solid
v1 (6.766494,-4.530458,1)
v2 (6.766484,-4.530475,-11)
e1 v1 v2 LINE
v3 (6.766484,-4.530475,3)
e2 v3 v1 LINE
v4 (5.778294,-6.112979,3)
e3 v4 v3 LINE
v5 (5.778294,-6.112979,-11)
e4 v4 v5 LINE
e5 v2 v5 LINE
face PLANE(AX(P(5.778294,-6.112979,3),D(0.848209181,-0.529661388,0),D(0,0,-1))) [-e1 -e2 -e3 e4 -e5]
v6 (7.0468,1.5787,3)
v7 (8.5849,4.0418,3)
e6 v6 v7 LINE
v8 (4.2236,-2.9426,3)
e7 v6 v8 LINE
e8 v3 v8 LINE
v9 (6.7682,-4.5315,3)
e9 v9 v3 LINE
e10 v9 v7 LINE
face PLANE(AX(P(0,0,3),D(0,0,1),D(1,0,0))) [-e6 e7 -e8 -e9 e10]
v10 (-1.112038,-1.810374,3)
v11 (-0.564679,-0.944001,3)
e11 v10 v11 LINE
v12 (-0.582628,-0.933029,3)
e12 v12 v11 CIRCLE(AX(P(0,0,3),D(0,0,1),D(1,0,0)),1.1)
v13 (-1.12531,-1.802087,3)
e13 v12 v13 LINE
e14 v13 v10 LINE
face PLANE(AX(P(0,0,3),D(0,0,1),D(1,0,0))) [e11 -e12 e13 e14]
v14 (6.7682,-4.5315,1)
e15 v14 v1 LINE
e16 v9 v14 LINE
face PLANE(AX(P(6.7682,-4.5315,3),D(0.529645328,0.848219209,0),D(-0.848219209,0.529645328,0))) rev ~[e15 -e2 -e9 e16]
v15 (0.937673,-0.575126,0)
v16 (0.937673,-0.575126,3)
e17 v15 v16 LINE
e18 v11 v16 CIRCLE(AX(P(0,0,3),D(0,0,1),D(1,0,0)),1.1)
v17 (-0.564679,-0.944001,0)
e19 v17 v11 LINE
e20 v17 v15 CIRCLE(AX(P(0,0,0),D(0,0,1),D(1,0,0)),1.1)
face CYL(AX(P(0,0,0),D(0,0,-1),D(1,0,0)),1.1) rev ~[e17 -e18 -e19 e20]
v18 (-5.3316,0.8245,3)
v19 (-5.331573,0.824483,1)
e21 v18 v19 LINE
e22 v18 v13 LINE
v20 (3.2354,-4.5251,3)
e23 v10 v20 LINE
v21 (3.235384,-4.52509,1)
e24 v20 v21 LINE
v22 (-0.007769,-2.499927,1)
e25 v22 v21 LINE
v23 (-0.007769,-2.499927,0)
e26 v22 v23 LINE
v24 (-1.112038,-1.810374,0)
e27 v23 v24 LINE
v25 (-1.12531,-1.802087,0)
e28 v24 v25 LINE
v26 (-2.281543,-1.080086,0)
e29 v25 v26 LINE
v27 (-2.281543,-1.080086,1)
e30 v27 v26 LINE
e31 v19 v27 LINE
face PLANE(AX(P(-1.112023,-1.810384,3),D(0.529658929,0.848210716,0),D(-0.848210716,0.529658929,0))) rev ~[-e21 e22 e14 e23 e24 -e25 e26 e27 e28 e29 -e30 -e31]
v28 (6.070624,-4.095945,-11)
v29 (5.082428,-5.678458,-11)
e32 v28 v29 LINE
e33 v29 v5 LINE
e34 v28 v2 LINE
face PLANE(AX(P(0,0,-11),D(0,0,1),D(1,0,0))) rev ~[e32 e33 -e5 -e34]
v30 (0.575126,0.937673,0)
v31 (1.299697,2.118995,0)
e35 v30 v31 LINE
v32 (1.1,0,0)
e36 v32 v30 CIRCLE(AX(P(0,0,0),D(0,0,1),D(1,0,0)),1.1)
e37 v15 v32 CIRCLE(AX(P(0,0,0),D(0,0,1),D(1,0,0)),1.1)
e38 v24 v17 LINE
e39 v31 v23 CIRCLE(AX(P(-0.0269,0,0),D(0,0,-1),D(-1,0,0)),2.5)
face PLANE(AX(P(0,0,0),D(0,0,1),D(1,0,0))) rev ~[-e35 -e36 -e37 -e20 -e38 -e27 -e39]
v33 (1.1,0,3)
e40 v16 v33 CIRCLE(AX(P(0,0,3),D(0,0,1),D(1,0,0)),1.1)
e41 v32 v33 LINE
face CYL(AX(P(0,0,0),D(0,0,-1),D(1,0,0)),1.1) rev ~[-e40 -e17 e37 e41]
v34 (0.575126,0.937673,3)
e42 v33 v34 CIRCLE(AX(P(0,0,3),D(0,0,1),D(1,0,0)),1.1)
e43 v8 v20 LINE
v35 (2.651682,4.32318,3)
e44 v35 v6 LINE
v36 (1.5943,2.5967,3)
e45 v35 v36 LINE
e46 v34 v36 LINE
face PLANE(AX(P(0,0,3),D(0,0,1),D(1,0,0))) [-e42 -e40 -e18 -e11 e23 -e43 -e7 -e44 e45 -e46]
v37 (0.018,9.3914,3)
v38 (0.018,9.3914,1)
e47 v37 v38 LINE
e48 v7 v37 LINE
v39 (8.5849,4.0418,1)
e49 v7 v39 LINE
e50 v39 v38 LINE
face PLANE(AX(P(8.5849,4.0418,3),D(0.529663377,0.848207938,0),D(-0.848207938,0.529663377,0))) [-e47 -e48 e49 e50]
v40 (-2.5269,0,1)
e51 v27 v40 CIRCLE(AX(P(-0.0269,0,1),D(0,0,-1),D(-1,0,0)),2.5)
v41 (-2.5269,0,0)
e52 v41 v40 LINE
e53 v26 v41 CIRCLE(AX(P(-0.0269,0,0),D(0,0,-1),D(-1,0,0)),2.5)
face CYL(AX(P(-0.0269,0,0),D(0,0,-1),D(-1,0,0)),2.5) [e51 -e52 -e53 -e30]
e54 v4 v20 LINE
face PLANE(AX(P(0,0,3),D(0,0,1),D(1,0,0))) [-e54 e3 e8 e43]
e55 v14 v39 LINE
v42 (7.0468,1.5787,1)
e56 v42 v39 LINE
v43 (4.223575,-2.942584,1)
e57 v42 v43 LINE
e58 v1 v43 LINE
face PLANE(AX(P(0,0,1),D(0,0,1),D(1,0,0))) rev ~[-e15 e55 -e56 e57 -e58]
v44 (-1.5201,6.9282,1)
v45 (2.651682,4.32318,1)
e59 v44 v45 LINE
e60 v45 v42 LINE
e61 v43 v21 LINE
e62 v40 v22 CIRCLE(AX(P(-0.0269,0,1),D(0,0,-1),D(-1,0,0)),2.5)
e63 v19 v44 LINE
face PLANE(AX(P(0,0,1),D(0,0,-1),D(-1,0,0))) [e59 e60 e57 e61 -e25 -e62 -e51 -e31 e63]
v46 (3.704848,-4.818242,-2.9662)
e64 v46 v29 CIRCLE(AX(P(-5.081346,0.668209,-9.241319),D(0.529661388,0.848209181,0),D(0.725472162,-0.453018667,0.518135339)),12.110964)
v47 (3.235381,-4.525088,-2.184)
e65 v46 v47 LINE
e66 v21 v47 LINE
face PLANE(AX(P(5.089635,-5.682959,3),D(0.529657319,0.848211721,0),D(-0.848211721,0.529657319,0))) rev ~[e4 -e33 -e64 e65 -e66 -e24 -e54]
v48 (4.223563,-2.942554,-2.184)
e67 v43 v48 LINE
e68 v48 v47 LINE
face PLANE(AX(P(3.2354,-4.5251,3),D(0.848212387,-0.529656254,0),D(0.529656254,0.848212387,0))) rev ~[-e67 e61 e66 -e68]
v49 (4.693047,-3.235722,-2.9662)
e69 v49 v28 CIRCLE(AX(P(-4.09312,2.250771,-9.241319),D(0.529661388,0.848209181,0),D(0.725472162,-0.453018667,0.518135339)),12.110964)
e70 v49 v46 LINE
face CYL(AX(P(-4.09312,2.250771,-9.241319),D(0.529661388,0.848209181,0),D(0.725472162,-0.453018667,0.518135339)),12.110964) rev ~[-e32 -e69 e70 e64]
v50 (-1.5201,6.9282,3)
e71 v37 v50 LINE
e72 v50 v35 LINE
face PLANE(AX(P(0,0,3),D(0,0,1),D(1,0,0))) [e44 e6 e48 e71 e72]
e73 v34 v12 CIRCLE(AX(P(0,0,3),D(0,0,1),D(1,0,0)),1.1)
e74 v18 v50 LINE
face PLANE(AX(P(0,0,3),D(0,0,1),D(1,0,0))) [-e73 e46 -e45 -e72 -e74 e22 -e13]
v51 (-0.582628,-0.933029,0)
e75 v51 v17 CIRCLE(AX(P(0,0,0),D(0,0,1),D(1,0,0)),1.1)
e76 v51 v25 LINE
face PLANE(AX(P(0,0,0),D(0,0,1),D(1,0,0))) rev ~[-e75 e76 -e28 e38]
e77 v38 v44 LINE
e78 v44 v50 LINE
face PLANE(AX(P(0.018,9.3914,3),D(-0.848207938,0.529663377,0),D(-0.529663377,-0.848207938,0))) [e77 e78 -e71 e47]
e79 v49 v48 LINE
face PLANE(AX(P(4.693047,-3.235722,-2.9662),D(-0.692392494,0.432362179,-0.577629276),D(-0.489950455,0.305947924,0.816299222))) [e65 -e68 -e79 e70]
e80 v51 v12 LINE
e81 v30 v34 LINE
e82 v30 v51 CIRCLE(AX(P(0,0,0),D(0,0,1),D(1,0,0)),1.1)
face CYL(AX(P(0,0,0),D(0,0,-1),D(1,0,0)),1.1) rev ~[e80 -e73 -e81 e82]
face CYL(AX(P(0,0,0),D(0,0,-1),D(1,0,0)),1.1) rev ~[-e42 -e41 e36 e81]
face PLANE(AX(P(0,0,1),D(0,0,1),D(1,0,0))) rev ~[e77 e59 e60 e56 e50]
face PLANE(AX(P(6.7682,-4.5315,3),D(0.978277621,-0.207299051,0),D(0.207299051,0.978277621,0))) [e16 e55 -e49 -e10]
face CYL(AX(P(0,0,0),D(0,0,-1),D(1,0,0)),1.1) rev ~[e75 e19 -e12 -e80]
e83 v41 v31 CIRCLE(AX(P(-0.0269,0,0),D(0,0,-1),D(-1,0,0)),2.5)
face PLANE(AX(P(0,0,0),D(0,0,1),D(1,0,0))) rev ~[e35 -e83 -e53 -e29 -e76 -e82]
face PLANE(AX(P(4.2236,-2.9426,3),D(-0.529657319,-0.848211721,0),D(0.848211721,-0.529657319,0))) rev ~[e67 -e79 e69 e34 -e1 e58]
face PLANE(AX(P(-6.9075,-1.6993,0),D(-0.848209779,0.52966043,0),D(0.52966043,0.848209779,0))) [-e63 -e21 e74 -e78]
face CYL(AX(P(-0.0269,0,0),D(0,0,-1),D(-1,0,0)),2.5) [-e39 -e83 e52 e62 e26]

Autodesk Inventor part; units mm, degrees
ref_plane "YZ Plane" through (0, 0, 0) normal (1, 0, 0) x (0, 1, 0)
ref_plane "XZ Plane" through (0, 0, 0) normal (0, 1, 0) x (-1, 0, 0)
ref_plane "XY Plane" through (0, 0, 0) normal (0, 0, 1) x (1, 0, 0)
sketch "Skizze1" plane through (0, 0, 0) normal (0, 0, 1) x (1, 0, 0)
  circle A0 centre (0, 0) radius 0.5718 construction
  circle A1 centre (0, 0) radius 1.1
  line L0 (-3.4324, -5.4831) -> (-0.3524, -0.608) projected
  line L1 (12.1628, 19.8522) -> (1.5943, 2.5967) projected
  line L2 (0, 0) -> (-2.7013, -4.3259)
  line L3 (0, 0) -> (2.6665, 4.3474)
  line L4 (0, 0) -> (4.3474, -2.6665)
  line L5 (1.6594, -7.0489) -> (-6.9075, -1.6993)
  line L6 (-6.9075, -1.6993) -> (-1.5201, 6.9282)
  line L7 (-1.5201, 6.9282) -> (7.0468, 1.5787)
  line L8 (7.0468, 1.5787) -> (1.6594, -7.0489)
  dimension "d0" = 2.2
  dimension "d1" = 5.1
  dimension "d2" = 5.1
  dimension "d3" = 5.1
  dimension "d4" = 10.1
extrude "Extrusion1" add sketch "Skizze1" along normal blind 3 contours A1 L3 L1 L7 L8 L5 L0 | A1 L2 L5 L6 L7 L1 L3 | A1 L0 L2
sketch "Skizze2" plane through (0, 0, 0) normal (0, 0, -1) x (-1, 0, 0)
  circle A0 centre (0, 0) radius 1.1 projected
  line L0 (-1.6594, -7.0489) -> (6.9075, -1.6993) projected
  line L1 (6.9075, -1.6993) -> (1.5201, 6.9282) projected
  line L2 (1.5201, 6.9282) -> (-7.0468, 1.5787) projected
  line L3 (-7.0468, 1.5787) -> (-1.6594, -7.0489) projected
  circle A1 centre (0, 0) radius 1.1
  circle A2 centre (0.0269, 0) radius 2.5
  dimension "d7" = 5
extrude "Extrusion2" cut sketch "Skizze2" against normal blind 1 contours L3 L2 L1 L0
sketch "Skizze3" plane through (0, 0, 3) normal (0, 0, 1) x (1, 0, 0)
  circle A0 centre (0, 0) radius 1.1 projected
  line L0 (-6.9075, -1.6993) -> (1.6594, -7.0489) projected
  line L1 (1.6594, -7.0489) -> (7.0468, 1.5787) projected
  line L2 (7.0468, 1.5787) -> (-1.5201, 6.9282) projected
  line L3 (-1.5201, 6.9282) -> (-6.9075, -1.6993) projected
  line L4 (-2.6241, -4.3741) -> (-1.1, -1.79)
  line L5 (-6.9075, -1.6993) -> (1.6594, -7.0489)
  line L6 (1.6594, -7.0489) -> (3.2354, -4.5251)
  line L7 (3.2354, -4.5251) -> (-5.3316, 0.8245)
  line L8 (-5.3316, 0.8245) -> (-6.9075, -1.6993)
  dimension "d10" = 3
extrude "Extrusion3" cut sketch "Skizze3" against normal through all contours L3 L7 L4 L0 | L4 L7 L1 L0
sketch "Skizze4" plane through (0, 0, 3) normal (0, 0, 1) x (1, 0, 0)
  line L0 (-5.3316, 0.8245) -> (3.2354, -4.5251) projected
  line L1 (3.2354, -4.5251) -> (7.0468, 1.5787) projected
  line L2 (7.0468, 1.5787) -> (-1.5201, 6.9282) projected
  line L3 (-1.5201, 6.9282) -> (-5.3316, 0.8245) projected
  circle A0 centre (0, 0) radius 1.1 projected
  line L4 (-5.3316, 0.8245) -> (3.2354, -4.5251) projected
  line L5 (-5.3316, 0.8245) -> (3.2354, -4.5251)
  line L6 (3.2354, -4.5251) -> (8.5849, 4.0418)
  line L7 (8.5849, 4.0418) -> (0.018, 9.3914)
  line L8 (0.018, 9.3914) -> (-5.3316, 0.8245)
  dimension "d13" = 10.1
extrude "Extrusion4" add sketch "Skizze4" against normal up to surface (2 mm away) contours L8 L7 L6 L2
sketch "Skizze5" plane through (0, 0, 3) normal (0, 0, 1) x (1, 0, 0)
  line L0 (4.2881, -6.9427) -> (6.1322, -4.0444) projected
  line L1 (5.7598, -3.8294) -> (4.7032, -3.2194) projected
  line L2 (-5.3316, 0.8245) -> (3.2354, -4.5251) projected
  line L3 (3.2354, -4.5251) -> (8.5849, 4.0418) projected
  line L4 (8.5849, 4.0418) -> (0.018, 9.3914) projected
  line L5 (0.018, 9.3914) -> (-5.3316, 0.8245) projected
  circle A0 centre (0, 0) radius 1.1 projected
  line L6 (3.2354, -4.5251) -> (8.5849, 4.0418) projected
  line L7 (3.2354, -4.5251) -> (4.2236, -2.9426)
  line L8 (4.2236, -2.9426) -> (7.6164, -5.0612)
  line L9 (7.6164, -5.0612) -> (6.6282, -6.6437)
  line L10 (6.6282, -6.6437) -> (3.2354, -4.5251)
  dimension "d16" = 4
extrude "Extrusion5" add sketch "Skizze5" against normal blind 14 contours L10 L3 L8 L0 | L0 L8 L9 L10
sketch "Skizze6" plane through (7.6164, -5.0612, 3) normal (0.5296614, 0.8482092, 0) x (0.8482092, -0.5296614, 0)
  line L0 (-1.7975, 12.28) -> (-2.2192, 15.496) projected
  line L1 (-1.9046, 10.7265) -> (-1.9053, 12.2728) projected
  line L2 (-1.9046, 10.7265) -> (-2.6926, 7.736) projected
  line L3 (-2.2272, 9.066) -> (-3.4465, 6.126) projected
  line L4 (-4.252, 5.184) -> (-3.4465, 6.126) projected
  line L5 (-4, 2) -> (-4, 14) projected
  arc A0 (-4, 5.4787) -> (-2.0084, 13.888) centre (-13.8052, 12.2414) ccw construction
  arc A1 (-3.4465, 5.9662) -> (-1.8224, 14) centre (-13.8052, 12.2414) ccw
  line L6 (-4, 14) -> (0, 14) projected
  line L7 (-1.8224, 14) -> (-4, 14)
  line L8 (-4, 14) -> (-4, 5.1324)
  line L9 (-1.9018, 5.1324) -> (-1.8224, 5.1324)
  line L10 (-3.4465, 5.9662) -> (-4, 5.184)
  point P0 (-9.141, 3)
extrude "Extrusion6" cut sketch "Skizze6" against normal through all
sketch "Skizze7" plane through (6.6282, -6.6437, 3) normal (0.8482092, -0.5296614, 0) x (0, 0, -1)
  line L0 (0, 0) -> (0, 1.8657) projected
  line L1 (0, 0) -> (14, 0) projected
  line L2 (14, 1.8657) -> (14, 0) projected
  line L3 (0, 1.8657) -> (14, 1.8657) projected
  point P0 (3, 2.1246)
extrude "Extrusion7" cut sketch "Skizze7" against normal blind 1
sketch "Skizze8" plane through (0, 0, 3) normal (0, 0, 1) x (1, 0, 0)
  circle A0 centre (0, 0) radius 1.1 projected
  line L0 (5.78, -6.1141) -> (6.7682, -4.5315) projected
  line L1 (6.7682, -4.5315) -> (4.2236, -2.9426) projected
  line L2 (4.2236, -2.9426) -> (8.5849, 4.0418) projected
  line L3 (8.5849, 4.0418) -> (0.018, 9.3914) projected
  line L4 (0.018, 9.3914) -> (-5.3316, 0.8245) projected
  line L5 (-5.3316, 0.8245) -> (5.78, -6.1141) projected
  line L6 (6.7682, -4.5315) -> (8.5849, 4.0418)
extrude "Extrusion8" add sketch "Skizze8" against normal up to surface (2 mm away) contours L1 L2 L6
properties part number "thumb_base_plate" material "Nylon 6/6"
